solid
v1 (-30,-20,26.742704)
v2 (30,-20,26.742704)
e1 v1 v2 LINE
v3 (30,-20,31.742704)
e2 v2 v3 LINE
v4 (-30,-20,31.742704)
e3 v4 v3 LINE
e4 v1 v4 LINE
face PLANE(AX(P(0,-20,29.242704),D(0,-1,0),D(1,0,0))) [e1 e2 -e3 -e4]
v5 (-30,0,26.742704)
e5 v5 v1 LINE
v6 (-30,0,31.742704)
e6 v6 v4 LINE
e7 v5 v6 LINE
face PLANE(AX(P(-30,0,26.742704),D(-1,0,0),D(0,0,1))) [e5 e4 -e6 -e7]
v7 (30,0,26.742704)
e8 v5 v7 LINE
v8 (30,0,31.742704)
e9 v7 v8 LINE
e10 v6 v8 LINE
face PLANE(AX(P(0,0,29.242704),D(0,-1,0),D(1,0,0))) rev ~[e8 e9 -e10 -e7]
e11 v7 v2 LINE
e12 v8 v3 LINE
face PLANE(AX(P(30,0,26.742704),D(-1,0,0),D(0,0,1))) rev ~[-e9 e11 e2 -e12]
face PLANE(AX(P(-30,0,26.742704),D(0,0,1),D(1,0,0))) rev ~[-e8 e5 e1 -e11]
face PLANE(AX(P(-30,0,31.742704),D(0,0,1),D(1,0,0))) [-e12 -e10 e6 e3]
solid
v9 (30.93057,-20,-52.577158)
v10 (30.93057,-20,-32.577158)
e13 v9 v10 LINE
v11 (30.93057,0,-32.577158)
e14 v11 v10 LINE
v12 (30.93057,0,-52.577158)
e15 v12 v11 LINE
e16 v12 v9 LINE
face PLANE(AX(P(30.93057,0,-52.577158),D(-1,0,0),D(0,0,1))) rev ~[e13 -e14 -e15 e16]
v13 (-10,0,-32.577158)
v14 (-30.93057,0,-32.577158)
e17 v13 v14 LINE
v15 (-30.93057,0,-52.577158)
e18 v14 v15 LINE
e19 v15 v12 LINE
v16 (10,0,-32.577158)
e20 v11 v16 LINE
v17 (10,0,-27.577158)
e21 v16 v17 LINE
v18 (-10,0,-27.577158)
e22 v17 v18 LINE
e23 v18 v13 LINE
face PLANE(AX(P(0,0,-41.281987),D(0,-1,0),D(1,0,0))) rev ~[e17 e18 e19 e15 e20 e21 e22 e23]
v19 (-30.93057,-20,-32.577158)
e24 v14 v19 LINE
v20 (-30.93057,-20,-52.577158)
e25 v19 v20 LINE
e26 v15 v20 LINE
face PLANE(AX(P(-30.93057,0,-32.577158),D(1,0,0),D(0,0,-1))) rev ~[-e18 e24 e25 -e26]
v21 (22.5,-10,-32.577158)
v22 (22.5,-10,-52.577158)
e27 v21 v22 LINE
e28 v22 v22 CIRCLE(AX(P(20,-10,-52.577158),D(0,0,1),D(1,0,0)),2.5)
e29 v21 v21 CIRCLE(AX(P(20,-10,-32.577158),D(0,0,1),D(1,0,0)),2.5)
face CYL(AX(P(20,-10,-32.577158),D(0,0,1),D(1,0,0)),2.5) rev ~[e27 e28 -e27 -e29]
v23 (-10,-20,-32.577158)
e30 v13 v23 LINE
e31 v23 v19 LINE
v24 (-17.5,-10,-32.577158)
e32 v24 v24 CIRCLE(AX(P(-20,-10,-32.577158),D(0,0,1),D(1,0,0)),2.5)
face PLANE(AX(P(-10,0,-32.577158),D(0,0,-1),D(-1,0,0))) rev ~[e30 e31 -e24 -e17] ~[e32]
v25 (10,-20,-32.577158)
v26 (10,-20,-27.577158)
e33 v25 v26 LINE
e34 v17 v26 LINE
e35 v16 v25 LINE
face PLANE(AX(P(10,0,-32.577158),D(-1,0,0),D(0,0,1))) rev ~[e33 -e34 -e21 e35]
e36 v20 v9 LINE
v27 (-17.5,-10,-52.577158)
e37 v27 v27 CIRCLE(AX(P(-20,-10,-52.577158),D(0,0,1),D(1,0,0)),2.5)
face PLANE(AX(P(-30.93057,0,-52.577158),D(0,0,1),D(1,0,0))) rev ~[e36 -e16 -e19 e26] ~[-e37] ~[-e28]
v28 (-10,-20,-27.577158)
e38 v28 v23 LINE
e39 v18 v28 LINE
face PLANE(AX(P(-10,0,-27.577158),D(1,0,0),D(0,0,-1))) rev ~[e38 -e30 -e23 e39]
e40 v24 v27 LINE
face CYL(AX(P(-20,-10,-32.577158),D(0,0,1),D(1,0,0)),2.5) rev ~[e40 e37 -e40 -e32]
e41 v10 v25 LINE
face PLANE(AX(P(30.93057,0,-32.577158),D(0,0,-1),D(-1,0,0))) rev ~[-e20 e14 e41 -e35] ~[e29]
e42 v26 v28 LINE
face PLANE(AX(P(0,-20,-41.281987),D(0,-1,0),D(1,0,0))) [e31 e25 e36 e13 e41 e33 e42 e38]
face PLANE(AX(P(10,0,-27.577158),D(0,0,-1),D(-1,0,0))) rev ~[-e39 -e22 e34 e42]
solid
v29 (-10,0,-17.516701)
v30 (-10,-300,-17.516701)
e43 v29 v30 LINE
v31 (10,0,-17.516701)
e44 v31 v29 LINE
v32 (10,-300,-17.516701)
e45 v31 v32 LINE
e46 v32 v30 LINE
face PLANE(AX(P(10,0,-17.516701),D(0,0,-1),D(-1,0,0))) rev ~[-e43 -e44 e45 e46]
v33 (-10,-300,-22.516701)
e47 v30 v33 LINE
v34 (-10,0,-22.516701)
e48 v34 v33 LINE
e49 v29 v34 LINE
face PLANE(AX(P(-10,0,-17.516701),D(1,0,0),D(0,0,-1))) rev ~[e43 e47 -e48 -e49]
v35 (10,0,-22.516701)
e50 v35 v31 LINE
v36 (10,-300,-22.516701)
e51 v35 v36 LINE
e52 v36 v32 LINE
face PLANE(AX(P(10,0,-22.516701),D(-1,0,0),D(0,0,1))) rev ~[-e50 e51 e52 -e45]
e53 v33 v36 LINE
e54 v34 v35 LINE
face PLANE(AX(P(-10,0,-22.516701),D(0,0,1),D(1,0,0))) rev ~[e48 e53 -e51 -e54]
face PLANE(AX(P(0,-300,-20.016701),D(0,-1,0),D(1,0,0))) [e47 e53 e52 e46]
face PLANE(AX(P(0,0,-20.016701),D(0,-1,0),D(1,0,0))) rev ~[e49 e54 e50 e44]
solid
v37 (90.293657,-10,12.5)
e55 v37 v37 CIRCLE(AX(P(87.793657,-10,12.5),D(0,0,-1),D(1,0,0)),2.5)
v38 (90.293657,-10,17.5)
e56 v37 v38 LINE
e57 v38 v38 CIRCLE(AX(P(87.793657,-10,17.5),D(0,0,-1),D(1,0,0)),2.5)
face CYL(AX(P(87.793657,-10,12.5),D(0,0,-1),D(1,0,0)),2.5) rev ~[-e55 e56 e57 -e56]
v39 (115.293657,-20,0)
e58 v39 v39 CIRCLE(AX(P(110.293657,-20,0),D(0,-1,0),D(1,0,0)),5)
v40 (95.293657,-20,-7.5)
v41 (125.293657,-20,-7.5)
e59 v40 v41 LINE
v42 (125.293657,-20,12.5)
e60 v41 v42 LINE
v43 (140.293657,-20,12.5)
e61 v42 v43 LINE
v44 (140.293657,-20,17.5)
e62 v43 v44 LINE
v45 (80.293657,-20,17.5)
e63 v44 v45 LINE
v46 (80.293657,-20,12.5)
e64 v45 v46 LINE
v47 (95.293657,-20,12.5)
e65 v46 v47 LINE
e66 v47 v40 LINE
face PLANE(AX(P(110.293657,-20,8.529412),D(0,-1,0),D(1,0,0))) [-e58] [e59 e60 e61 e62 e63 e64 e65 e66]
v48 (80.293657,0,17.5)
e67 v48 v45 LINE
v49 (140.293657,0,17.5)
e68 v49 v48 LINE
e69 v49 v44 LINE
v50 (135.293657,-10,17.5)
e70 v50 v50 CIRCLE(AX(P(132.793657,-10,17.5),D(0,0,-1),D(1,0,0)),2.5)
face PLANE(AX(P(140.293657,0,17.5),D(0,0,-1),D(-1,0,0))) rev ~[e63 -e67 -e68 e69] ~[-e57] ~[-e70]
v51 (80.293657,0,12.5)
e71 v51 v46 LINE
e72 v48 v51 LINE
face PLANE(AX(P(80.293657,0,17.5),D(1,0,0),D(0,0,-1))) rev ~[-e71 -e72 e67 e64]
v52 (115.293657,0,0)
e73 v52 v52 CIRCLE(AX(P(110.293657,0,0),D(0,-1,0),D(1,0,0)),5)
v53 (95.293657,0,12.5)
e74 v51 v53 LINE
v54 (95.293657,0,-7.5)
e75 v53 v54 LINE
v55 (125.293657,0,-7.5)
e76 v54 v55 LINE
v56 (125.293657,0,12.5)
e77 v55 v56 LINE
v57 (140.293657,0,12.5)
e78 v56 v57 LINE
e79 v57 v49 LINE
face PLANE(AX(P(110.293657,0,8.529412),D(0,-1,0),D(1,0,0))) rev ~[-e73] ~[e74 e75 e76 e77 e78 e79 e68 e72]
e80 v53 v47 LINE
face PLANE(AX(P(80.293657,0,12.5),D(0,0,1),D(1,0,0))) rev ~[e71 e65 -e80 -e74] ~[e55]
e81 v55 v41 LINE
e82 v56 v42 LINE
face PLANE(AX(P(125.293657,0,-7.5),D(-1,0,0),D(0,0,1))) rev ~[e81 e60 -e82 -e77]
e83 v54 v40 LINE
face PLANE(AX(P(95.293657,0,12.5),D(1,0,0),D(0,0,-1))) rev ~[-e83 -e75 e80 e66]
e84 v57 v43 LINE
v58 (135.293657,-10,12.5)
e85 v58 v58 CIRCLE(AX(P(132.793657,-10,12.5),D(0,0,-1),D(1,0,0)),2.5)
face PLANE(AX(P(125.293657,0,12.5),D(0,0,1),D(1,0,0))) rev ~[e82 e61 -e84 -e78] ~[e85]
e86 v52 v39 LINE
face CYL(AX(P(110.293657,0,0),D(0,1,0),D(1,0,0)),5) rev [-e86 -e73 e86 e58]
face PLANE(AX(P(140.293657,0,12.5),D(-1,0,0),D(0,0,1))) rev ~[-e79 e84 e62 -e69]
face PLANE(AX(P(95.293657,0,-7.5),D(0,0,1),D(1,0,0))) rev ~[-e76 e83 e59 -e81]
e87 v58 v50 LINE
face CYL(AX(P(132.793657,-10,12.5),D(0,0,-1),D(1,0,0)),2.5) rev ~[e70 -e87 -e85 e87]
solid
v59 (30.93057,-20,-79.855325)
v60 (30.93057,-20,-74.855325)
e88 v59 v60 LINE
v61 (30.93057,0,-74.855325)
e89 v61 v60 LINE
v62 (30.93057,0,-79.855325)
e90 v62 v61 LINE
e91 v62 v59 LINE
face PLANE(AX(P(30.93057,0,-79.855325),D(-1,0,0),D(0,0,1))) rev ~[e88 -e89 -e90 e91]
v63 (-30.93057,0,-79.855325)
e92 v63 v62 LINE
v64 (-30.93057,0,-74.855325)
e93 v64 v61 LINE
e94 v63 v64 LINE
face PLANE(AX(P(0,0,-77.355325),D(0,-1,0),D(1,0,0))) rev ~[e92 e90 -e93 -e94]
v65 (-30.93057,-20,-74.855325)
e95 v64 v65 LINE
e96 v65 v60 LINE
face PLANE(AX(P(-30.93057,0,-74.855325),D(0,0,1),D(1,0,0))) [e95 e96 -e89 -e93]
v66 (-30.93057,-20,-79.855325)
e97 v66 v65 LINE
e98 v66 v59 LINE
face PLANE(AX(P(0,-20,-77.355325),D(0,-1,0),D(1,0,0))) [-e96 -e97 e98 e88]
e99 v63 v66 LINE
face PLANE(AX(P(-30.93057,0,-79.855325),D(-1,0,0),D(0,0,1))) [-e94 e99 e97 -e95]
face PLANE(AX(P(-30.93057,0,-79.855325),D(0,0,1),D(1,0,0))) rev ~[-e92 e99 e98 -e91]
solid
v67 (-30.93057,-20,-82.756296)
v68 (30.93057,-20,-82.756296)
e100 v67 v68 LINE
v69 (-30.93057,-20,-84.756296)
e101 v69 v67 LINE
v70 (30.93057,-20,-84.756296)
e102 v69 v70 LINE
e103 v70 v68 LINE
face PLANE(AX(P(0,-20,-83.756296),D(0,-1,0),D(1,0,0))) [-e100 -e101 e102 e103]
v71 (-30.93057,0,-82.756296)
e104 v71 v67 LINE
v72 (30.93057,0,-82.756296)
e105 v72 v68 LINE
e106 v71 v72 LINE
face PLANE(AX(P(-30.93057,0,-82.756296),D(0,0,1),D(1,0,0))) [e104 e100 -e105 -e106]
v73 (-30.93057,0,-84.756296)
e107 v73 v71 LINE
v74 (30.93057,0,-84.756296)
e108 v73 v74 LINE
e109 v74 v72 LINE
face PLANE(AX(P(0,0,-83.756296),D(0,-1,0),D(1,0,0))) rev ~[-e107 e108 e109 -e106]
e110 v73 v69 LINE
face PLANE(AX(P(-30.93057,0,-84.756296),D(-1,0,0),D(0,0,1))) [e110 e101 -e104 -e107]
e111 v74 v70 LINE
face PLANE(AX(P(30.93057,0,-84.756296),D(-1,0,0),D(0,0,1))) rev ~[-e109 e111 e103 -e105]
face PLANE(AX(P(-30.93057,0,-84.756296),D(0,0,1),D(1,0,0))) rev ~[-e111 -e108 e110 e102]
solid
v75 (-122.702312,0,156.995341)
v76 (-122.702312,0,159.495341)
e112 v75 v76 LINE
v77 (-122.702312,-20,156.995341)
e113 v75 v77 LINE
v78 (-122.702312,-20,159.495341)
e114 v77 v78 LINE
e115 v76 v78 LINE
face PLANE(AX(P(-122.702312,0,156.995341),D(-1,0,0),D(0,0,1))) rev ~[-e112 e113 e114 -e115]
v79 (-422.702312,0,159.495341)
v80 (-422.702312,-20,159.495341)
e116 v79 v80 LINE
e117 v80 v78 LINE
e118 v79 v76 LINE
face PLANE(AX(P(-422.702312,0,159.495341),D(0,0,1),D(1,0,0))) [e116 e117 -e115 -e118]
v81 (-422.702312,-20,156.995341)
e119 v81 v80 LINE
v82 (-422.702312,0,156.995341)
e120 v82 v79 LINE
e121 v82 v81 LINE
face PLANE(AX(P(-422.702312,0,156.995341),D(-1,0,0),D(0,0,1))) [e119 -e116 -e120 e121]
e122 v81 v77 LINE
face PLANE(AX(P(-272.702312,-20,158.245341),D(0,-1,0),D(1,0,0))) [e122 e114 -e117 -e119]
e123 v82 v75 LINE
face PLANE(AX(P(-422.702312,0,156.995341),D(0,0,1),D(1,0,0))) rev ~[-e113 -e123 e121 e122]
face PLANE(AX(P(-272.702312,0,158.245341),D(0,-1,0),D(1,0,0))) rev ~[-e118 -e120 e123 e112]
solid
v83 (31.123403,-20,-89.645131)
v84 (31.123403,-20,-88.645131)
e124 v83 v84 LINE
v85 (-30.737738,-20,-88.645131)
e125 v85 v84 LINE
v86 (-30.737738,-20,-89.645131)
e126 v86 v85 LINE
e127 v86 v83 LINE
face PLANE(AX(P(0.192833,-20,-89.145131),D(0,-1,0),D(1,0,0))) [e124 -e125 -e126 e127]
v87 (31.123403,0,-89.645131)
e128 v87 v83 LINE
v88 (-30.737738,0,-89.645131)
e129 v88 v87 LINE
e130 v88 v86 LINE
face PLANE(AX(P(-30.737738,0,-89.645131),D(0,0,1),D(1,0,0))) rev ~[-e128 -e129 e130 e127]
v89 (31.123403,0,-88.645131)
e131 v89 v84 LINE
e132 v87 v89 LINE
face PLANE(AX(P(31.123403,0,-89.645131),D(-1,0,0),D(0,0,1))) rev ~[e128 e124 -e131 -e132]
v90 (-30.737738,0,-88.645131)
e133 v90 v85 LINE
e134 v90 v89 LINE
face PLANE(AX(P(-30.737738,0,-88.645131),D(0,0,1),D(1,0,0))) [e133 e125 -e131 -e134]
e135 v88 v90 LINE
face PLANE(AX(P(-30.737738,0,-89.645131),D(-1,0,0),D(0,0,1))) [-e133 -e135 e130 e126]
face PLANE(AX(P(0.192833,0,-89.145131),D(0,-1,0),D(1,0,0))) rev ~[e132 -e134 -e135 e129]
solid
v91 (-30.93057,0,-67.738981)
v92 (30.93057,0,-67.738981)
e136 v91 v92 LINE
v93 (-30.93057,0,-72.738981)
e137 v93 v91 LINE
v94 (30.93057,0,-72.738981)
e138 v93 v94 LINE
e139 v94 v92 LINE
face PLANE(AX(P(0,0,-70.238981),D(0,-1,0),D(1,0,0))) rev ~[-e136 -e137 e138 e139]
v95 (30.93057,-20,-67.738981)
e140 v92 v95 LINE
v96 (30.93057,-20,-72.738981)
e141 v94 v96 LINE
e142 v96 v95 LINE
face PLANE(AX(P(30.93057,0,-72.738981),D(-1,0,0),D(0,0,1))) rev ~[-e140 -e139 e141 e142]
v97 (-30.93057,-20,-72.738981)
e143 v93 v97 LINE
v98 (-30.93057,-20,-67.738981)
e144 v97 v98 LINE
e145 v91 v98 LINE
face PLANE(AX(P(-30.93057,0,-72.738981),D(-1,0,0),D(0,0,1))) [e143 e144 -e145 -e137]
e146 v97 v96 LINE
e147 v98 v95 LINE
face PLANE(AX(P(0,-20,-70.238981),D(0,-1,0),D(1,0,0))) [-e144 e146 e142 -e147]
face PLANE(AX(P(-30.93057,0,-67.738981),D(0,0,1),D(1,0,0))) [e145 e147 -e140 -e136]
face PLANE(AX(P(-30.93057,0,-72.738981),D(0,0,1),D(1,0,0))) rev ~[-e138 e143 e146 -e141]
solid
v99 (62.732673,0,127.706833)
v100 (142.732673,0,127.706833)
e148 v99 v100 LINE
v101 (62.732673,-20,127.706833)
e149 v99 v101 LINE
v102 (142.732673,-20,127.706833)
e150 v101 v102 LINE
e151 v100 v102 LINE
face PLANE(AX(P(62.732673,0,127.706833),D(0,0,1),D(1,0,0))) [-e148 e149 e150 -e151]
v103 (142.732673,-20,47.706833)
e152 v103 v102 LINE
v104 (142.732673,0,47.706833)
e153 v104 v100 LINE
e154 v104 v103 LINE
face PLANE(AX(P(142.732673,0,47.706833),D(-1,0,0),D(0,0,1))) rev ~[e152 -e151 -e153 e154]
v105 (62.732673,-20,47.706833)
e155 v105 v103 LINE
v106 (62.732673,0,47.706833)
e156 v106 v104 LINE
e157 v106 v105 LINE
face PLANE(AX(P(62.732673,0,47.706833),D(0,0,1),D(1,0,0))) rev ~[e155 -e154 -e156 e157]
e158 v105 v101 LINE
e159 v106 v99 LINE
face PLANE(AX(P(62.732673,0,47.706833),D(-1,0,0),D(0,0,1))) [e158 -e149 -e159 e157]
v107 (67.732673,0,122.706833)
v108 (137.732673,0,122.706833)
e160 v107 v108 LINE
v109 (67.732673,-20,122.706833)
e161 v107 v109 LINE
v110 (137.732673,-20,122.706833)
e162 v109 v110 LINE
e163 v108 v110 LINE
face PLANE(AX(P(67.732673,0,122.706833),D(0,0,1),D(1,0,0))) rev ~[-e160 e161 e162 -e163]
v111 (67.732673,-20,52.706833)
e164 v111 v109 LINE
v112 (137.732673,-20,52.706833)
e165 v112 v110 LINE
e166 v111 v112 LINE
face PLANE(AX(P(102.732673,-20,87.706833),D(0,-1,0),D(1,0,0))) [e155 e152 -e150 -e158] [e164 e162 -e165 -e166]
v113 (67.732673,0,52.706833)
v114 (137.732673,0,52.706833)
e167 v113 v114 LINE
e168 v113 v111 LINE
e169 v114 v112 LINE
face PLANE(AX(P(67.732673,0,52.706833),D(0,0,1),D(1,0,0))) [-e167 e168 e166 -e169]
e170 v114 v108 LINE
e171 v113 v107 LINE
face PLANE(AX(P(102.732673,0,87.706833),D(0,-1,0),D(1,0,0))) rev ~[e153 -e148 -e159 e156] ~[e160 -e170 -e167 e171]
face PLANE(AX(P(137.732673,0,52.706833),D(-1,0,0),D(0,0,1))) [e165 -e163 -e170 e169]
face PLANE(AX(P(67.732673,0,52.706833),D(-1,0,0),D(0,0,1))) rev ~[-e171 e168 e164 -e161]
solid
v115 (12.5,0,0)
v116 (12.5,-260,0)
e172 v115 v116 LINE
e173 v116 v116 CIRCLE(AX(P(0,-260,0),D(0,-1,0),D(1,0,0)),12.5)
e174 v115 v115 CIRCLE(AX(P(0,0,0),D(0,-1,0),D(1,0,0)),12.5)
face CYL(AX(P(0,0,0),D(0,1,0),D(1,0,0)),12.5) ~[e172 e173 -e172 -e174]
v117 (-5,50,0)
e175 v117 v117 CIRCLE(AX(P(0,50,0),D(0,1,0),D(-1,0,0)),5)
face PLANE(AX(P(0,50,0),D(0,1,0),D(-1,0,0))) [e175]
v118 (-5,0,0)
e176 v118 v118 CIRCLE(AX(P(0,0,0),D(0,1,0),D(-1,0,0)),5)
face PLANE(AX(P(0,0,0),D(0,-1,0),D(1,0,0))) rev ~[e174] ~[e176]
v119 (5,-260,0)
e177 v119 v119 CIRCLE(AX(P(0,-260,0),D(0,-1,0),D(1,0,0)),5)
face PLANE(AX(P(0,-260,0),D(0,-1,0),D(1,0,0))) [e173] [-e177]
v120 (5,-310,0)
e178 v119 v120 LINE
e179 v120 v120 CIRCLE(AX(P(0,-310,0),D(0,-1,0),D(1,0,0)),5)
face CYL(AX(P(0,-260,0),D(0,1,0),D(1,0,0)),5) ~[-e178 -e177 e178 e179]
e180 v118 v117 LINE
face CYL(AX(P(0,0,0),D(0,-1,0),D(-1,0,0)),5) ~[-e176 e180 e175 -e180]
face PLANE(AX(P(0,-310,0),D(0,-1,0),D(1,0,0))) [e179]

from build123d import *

# Parameters (mm, degrees)
F0_R      = 5
F1_DEPTH  = 20
F0_W      = 60
F0_H      = 5
F0_W_2    = 80
F0_H_2    = 80
F0_W_3    = 70
F0_H_3    = 70
F0_W_4    = 61.861140081
F0_H_4    = 1
F0_H_5    = 2
F0_W_5    = 300
F0_H_6    = 2.5
F0_R_2    = 12.5
F2_DEPTH  = 260
F3_R      = 5
F4_DEPTH  = 50
F5_DEPTH  = 300
F6_R      = 2.5
F7_R      = 2.5
F8_DEPTH  = 25
F10_R     = 2.5
F9_R      = 2.5
F11_DEPTH = 25
F17_R     = 5
F18_DEPTH = 50


# Not quite as in the source:
# - a feature of the source that left no trace in its solid (it failed there, or was rolled back) is left out
# - a feature names something its author has since deleted; it is built from what else it names


with BuildPart() as f1:
    # F0 (on Front) → F1 (new body)
    with BuildSketch(Plane.XZ):
        Polygon((95.2936565876, -7.5), (110.2936565876, -7.5), (125.2936565876, -7.5), (125.2936565876, 12.5), (140.2936565876, 12.5), (140.2936565876, 17.5), (110.2936565876, 17.5), (80.2936565876, 17.5), (80.2936565876, 12.5), (95.2936565876, 12.5), align=None)
        with Locations((110.2936565876, 0)):
            Circle(F0_R, mode=Mode.SUBTRACT)
    extrude(amount=F1_DEPTH)

    # F10 (on face) + F9 (on face) → F11 (cut)
    with BuildSketch(Plane(origin=(0, 0, 12.5), x_dir=(1, 0, 0), z_dir=(0, 0, -1))):
        with Locations((87.7936565876, 10)):
            Circle(F10_R)
    with BuildSketch(Plane(origin=(0, 0, 12.5), x_dir=(1, 0, 0), z_dir=(0, 0, -1))):
        with Locations((132.7936565876, 10)):
            Circle(F9_R)
    extrude(amount=-F11_DEPTH, mode=Mode.SUBTRACT)


with BuildPart() as f1b:
    # F0 (on Front) → F1, piece 2 (new body)
    with BuildSketch(Plane.XZ):
        with Locations((0, 29.2427036911)):
            Rectangle(F0_W, F0_H)
    extrude(amount=F1_DEPTH)


with BuildPart() as f1c:
    # F0 (on Front) → F1, piece 3 (new body)
    with BuildSketch(Plane.XZ):
        Polygon((10, -27.5771580637), (0, -27.5771580637), (-10, -27.5771580637), (-10, -32.5771580637), (-10.9305700405, -32.5771580637), (-30.9305700405, -32.5771580637), (-30.9305700405, -52.5771580637), (0, -52.5771580637), (30.9305700405, -52.5771580637), (30.9305700405, -32.5771580637), (10.9305700405, -32.5771580637), (10, -32.5771580637), align=None)
    extrude(amount=F1_DEPTH)

    # F6 (on face) + F7 (on face) → F8 (cut)
    with BuildSketch(Plane.XY.offset(-32.5771580637)):
        with Locations((-20, -10)):
            Circle(F6_R)
    with BuildSketch(Plane.XY.offset(-32.5771580637)):
        with Locations((20, -10)):
            Circle(F7_R)
    extrude(amount=-F8_DEPTH, mode=Mode.SUBTRACT)


with BuildPart() as f1d:
    # F0 (on Front) → F1, piece 4 (new body)
    with BuildSketch(Plane.XZ):
        with Locations((102.7326732874, 87.7068325877)):
            Rectangle(F0_W_2, F0_H_2)
        with Locations((102.7326732874, 87.7068325877)):
            Rectangle(F0_W_3, F0_H_3, mode=Mode.SUBTRACT)
    extrude(amount=F1_DEPTH)


with BuildPart() as f1e:
    # F0 (on Front) → F1, piece 5 (new body)
    with BuildSketch(Plane.XZ):
        with Locations((0, -77.355325222)):
            Rectangle(F0_W_4, F0_H)
    extrude(amount=F1_DEPTH)


with BuildPart() as f1f:
    # F0 (on Front) → F1, piece 6 (new body)
    with BuildSketch(Plane.XZ):
        with Locations((0.1928325291, -89.1451310813)):
            Rectangle(F0_W_4, F0_H_4)
    extrude(amount=F1_DEPTH)


with BuildPart() as f1g:
    # F0 (on Front) → F1, piece 7 (new body)
    with BuildSketch(Plane.XZ):
        with Locations((0, -83.756296128)):
            Rectangle(F0_W_4, F0_H_5)
    extrude(amount=F1_DEPTH)


with BuildPart() as f1h:
    # F0 (on Front) → F1, piece 8 (new body)
    with BuildSketch(Plane.XZ):
        with Locations((0, -70.2389810979)):
            Rectangle(F0_W_4, F0_H)
    extrude(amount=F1_DEPTH)


with BuildPart() as f1i:
    # F0 (on Front) → F1, piece 9 (new body)
    with BuildSketch(Plane.XZ):
        with Locations((-272.7023124695, 158.2453411818)):
            Rectangle(F0_W_5, F0_H_6)
    extrude(amount=F1_DEPTH)


with BuildPart() as f2:
    # F0 (on Front) → F2 (new body)
    with BuildSketch(Plane.XZ):
        Circle(F0_R_2)
    extrude(amount=F2_DEPTH)

    # F3 (on face) → F4 (join)
    with BuildSketch(Plane.XZ.offset(260)):
        Circle(F3_R)
    extrude(amount=F4_DEPTH)

    # F17 (on face) → F18 (join)
    with BuildSketch(Plane(origin=(0, 0, 0), x_dir=(-1, 0, 0), z_dir=(0, 1, 0))):
        Circle(F17_R)
    extrude(amount=F18_DEPTH)


with BuildPart() as f5:
    # F0 (on Front) → F5 (new body)
    with BuildSketch(Plane.XZ):
        Polygon((-10, -22.5167013705), (0, -22.5167013705), (10, -22.5167013705), (10, -17.5167013705), (0, -17.5167013705), (-10, -17.5167013705), align=None)
    extrude(amount=F5_DEPTH)


solid = Compound([f1.part, f1b.part, f1c.part, f1d.part, f1e.part, f1f.part, f1g.part, f1h.part, f1i.part, f2.part, f5.part])
